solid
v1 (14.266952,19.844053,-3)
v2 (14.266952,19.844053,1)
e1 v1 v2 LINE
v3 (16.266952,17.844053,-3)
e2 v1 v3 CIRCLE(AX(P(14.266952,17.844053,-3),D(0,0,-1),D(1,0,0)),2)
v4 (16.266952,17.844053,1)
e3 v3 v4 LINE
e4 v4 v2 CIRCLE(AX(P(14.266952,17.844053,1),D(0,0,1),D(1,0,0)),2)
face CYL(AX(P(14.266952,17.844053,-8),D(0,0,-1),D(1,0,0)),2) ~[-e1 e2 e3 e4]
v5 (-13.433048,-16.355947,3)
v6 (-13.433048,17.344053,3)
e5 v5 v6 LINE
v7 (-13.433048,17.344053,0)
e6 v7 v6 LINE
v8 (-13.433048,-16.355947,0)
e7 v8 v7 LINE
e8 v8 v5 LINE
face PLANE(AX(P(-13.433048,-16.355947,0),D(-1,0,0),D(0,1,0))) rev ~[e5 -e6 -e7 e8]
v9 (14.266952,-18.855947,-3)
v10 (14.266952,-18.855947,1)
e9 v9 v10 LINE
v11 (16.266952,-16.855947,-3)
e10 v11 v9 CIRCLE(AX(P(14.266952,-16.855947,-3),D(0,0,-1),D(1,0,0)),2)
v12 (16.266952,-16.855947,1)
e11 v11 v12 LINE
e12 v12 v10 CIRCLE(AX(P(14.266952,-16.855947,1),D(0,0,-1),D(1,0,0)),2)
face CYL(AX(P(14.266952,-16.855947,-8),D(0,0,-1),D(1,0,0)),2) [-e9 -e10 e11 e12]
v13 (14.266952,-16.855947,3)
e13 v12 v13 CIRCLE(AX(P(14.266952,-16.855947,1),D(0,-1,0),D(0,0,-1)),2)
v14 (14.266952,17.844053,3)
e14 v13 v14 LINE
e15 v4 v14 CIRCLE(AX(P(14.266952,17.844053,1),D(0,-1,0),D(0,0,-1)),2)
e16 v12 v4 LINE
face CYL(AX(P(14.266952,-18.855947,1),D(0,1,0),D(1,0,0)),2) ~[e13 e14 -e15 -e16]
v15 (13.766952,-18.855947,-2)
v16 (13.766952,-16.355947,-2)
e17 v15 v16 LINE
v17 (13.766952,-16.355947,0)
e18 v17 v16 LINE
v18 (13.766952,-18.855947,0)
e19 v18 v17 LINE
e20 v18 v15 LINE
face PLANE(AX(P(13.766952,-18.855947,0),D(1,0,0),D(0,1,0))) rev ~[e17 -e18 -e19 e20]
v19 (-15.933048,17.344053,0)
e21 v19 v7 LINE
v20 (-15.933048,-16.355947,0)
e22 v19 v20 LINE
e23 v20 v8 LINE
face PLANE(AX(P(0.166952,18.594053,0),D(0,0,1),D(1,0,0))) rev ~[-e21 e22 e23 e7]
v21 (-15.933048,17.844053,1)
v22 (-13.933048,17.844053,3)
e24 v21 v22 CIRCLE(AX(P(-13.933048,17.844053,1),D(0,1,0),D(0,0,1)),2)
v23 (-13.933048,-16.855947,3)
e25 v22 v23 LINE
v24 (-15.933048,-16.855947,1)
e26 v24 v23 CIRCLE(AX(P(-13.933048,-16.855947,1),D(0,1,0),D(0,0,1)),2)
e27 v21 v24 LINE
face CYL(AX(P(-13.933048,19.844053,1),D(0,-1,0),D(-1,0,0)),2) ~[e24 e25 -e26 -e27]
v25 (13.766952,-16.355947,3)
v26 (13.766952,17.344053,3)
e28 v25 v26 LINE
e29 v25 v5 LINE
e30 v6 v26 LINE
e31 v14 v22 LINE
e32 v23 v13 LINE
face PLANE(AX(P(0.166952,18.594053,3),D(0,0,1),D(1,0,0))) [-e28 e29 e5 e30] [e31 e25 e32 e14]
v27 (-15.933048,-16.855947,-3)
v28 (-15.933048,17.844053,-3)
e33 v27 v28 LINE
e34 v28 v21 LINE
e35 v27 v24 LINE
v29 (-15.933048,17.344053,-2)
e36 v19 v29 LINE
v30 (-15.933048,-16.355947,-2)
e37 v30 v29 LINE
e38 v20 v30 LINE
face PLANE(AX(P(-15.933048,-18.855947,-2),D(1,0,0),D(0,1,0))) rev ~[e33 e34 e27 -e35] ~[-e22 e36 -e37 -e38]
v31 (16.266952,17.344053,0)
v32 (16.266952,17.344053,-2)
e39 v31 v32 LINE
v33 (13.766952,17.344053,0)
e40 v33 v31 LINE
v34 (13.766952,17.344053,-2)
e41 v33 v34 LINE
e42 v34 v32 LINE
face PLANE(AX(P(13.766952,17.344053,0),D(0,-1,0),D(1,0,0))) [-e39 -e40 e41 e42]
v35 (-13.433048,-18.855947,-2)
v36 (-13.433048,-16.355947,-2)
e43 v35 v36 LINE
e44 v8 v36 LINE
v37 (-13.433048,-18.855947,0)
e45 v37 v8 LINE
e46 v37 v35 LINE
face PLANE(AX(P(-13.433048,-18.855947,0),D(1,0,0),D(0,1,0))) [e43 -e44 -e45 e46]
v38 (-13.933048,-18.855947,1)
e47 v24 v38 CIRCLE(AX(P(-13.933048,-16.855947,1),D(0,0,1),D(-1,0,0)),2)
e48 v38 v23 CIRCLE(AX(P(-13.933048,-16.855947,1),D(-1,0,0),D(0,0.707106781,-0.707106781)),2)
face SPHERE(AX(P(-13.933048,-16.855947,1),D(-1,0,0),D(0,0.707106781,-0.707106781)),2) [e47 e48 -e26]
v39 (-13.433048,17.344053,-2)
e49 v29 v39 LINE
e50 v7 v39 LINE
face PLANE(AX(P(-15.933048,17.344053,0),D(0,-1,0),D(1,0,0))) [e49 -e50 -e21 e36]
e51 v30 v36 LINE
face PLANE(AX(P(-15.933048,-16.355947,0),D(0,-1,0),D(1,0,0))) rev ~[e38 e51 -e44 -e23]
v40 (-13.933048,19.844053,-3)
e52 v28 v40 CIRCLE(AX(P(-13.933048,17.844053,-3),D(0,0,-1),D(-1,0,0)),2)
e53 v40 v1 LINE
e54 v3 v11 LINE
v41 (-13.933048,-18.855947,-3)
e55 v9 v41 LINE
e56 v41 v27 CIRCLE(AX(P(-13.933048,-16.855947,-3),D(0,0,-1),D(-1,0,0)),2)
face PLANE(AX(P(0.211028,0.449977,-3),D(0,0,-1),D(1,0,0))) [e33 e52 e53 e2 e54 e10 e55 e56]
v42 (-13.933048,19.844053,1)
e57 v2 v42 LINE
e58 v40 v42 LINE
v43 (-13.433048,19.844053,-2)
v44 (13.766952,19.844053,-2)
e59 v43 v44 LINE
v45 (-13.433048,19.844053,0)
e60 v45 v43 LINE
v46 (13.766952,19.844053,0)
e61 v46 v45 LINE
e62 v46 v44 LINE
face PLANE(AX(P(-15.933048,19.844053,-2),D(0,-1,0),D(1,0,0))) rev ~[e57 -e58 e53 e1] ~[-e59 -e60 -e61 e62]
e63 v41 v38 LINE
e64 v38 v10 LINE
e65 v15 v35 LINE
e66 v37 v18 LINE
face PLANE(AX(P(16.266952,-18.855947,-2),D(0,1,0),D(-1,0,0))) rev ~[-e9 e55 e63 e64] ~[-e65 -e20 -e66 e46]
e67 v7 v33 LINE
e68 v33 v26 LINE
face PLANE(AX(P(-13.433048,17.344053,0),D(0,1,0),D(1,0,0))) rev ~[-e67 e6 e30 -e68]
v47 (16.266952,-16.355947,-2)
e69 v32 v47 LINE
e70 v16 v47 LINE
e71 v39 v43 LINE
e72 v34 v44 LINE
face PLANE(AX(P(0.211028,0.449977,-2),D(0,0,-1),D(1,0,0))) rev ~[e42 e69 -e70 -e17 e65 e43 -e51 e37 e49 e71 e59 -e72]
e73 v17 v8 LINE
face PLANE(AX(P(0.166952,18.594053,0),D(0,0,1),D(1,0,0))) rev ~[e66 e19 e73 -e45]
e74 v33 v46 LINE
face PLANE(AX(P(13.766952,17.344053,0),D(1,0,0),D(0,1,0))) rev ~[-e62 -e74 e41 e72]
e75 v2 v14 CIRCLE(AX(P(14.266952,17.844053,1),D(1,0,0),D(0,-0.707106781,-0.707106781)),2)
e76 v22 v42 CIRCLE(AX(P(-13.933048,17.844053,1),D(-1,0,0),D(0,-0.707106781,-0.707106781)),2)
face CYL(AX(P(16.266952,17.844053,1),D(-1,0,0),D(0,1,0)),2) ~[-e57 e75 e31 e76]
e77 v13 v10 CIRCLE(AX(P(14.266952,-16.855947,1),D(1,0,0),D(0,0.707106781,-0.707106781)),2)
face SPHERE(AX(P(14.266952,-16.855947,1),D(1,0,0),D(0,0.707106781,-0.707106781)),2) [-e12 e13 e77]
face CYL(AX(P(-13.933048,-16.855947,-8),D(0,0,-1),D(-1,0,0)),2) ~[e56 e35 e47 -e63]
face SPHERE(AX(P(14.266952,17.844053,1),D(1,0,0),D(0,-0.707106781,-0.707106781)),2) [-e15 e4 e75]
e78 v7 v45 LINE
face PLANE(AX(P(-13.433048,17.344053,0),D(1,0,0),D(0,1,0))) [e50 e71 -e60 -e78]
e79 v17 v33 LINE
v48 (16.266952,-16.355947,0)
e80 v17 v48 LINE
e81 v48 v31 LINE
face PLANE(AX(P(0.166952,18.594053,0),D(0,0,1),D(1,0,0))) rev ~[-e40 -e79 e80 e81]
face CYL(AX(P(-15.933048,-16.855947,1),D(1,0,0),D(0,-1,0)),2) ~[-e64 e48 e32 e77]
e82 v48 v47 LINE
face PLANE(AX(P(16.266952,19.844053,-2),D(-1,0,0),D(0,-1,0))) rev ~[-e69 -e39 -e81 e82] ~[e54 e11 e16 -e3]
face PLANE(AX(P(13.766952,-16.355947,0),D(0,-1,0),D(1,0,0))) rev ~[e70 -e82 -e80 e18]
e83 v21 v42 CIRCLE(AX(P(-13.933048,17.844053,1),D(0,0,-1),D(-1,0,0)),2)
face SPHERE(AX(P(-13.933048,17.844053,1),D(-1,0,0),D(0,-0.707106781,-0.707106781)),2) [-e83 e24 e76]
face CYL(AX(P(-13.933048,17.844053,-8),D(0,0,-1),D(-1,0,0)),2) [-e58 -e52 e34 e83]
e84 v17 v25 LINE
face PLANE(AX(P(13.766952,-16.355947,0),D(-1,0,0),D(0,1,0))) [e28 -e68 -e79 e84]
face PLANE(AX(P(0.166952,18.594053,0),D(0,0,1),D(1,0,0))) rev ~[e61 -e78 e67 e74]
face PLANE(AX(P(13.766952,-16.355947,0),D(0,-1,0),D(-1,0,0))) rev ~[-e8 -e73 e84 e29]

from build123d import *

# Parameters (mm, degrees)
F0_W         = 27.2
F0_H         = 2.5
F0_W_2       = 2.5
F0_H_2       = 33.7
F1_DEPTH     = 3
F2_R         = 2
F3_DEPTH     = 2
F4_W         = 2.5
F4_H         = 2.5
F5_DEPTH     = 1
F6_T1_DEPTH  = 9
F6_S5_W      = 2
F6_S5_H      = 2
F6_T6_DEPTH  = 2
F6_S11_W     = 2
F6_S11_H     = 2
F6_T12_DEPTH = 2
F6_S17_W     = 2
F6_S17_H     = 2
F6_T18_DEPTH = 2
F6_S23_W     = 2
F6_S23_H     = 2
F6_T24_DEPTH = 2


# Not quite as in the source:
# - a fillet or chamfer that OpenCascade refuses, or shapes differently, is made with other operations: its cross-section is extruded or revolved along the edge and cut away or added


with BuildPart() as f1:
    # F0 (on Top) → F1 (new body)
    with BuildSketch(Plane.XY):
        with Locations((0.1669520199, 18.5940534235)):
            Rectangle(F0_W, F0_H)
        with Locations((-14.6830479801, 0.4940534235)):
            Rectangle(F0_W_2, F0_H_2)
        with Locations((-14.6830479801, 18.5940534235)):
            Rectangle(F0_W_2, F0_H)
        with Locations((-14.6830479801, -17.6059465765)):
            Rectangle(F0_W_2, F0_H)
        with Locations((0.1669520199, -17.6059465765)):
            Rectangle(F0_W, F0_H)
        with Locations((15.0169520199, -17.6059465765)):
            Rectangle(F0_W_2, F0_H)
        with Locations((15.0169520199, 0.4940534235)):
            Rectangle(F0_W_2, F0_H_2)
        with Locations((15.0169520199, 18.5940534235)):
            Rectangle(F0_W_2, F0_H)
    extrude(amount=F1_DEPTH)

    # F2
    f2_edges = [f1.edges().sort_by_distance(p)[0] for p in [
        (16.266952, 0.494053, 3),
        (0.166952, 19.844053, 3),
        (-15.933048, 0.494053, 3),
        (0.166952, -18.855947, 3),
    ]]
    fillet(f2_edges, radius=F2_R)

    # F0 (on Top) → F3 (join)
    with BuildSketch(Plane.XY):
        with Locations((-14.6830479801, -17.6059465765)):
            Rectangle(F0_W_2, F0_H)
        with Locations((15.0169520199, -17.6059465765)):
            Rectangle(F0_W_2, F0_H)
        with Locations((15.0169520199, 18.5940534235)):
            Rectangle(F0_W_2, F0_H)
        with Locations((-14.6830479801, 18.5940534235)):
            Rectangle(F0_W_2, F0_H)
    extrude(amount=-F3_DEPTH)

    # F4 (on face) → F5 (join)
    with BuildSketch(Plane(origin=(0, 0, -2), x_dir=(1, 0, 0), z_dir=(0, 0, -1))):
        Polygon((-13.4330479801, -19.8440534235), (16.2669520199, -19.8440534235), (16.2669520199, 18.8559465765), (-15.9330479801, 18.8559465765), (-15.9330479801, -17.3440534235), (-13.4330479801, -17.3440534235), align=None)
        with Locations((-14.6830479801, -18.5940534235)):
            Rectangle(F4_W, F4_H)
    extrude(amount=F5_DEPTH)

    # F6: fillet of radius 2 on 4 edges, made by hand

    # F6_s2 → F6_t1 (cut)
    with BuildSketch(Plane.XY.offset(-8)):
        with BuildLine():
            ThreePointArc((16.2669520199, 17.8440534235), (15.6811655823, 19.2582669858), (14.2669520199, 19.8440534235))
            Line((14.2669520199, 19.8440534235), (16.2669520199, 19.8440534235))
            Line((16.2669520199, 19.8440534235), (16.2669520199, 17.8440534235))
        make_face()
        with BuildLine():
            ThreePointArc((16.2669520199, -16.8559465765), (15.6811655823, -18.2701601389), (14.2669520199, -18.8559465765))
            Line((14.2669520199, -18.8559465765), (16.2669520199, -18.8559465765))
            Line((16.2669520199, -18.8559465765), (16.2669520199, -16.8559465765))
        make_face()
        with BuildLine():
            ThreePointArc((-15.9330479801, -16.8559465765), (-15.3472615424, -18.2701601389), (-13.9330479801, -18.8559465765))
            Line((-13.9330479801, -18.8559465765), (-15.9330479801, -18.8559465765))
            Line((-15.9330479801, -18.8559465765), (-15.9330479801, -16.8559465765))
        make_face()
        with BuildLine():
            ThreePointArc((-15.9330479801, 17.8440534235), (-15.3472615424, 19.2582669858), (-13.9330479801, 19.8440534235))
            Line((-13.9330479801, 19.8440534235), (-15.9330479801, 19.8440534235))
            Line((-15.9330479801, 19.8440534235), (-15.9330479801, 17.8440534235))
        make_face()
    extrude(amount=F6_T1_DEPTH, mode=Mode.SUBTRACT)


with BuildPart() as f6_tool4:
    # F6_s5 → F6_t6 (new body)
    with BuildSketch(Plane.YZ.offset(-13.9330479801)):
        with Locations((18.8440534235, 2)):
            Rectangle(F6_S5_W, F6_S5_H)
    extrude(amount=-F6_T6_DEPTH)

    # F6_s7 → F6_t8 (revolve, cut)
    with BuildSketch(Plane(origin=(-13.9330479801, 17.8440534235, 1), x_dir=(0, -0.7071067812, -0.7071067812), z_dir=(0, 0.7071067812, -0.7071067812))):
        with BuildLine():
            ThreePointArc((0, -2), (2, 0), (0, 2))
            Line((0, 2), (0, -2))
        make_face()
    revolve(axis=Axis((-13.9330479801, 17.8440534235, 1), (-1, 0, 0)), mode=Mode.SUBTRACT)


with BuildPart() as f1_1:
    add(f1.part)

    # F6_t3: cut F6_tool4
    add(f6_tool4.part, mode=Mode.SUBTRACT)


with BuildPart() as f6_tool10:
    # F6_s11 → F6_t12 (new body)
    with BuildSketch(Plane.YZ.offset(-13.9330479801)):
        with Locations((-17.8559465765, 2)):
            Rectangle(F6_S11_W, F6_S11_H)
    extrude(amount=-F6_T12_DEPTH)

    # F6_s13 → F6_t14 (revolve, cut)
    with BuildSketch(Plane(origin=(-13.9330479801, -16.8559465765, 1), x_dir=(0, 0.7071067812, -0.7071067812), z_dir=(0, 0.7071067812, 0.7071067812))):
        with BuildLine():
            ThreePointArc((0, -2), (2, 0), (0, 2))
            Line((0, 2), (0, -2))
        make_face()
    revolve(axis=Axis((-13.9330479801, -16.8559465765, 1), (-1, 0, 0)), mode=Mode.SUBTRACT)


with BuildPart() as f1_2:
    add(f1_1.part)

    # F6_t9: cut F6_tool10
    add(f6_tool10.part, mode=Mode.SUBTRACT)


with BuildPart() as f6_tool16:
    # F6_s17 → F6_t18 (new body)
    with BuildSketch(Plane.YZ.offset(14.2669520199)):
        with Locations((-17.8559465765, 2)):
            Rectangle(F6_S17_W, F6_S17_H)
    extrude(amount=F6_T18_DEPTH)

    # F6_s19 → F6_t20 (revolve, cut)
    with BuildSketch(Plane(origin=(14.2669520199, -16.8559465765, 1), x_dir=(0, 0.7071067812, -0.7071067812), z_dir=(0, -0.7071067812, -0.7071067812))):
        with BuildLine():
            ThreePointArc((0, -2), (2, 0), (0, 2))
            Line((0, 2), (0, -2))
        make_face()
    revolve(axis=Axis((14.2669520199, -16.8559465765, 1), (1, 0, 0)), mode=Mode.SUBTRACT)


with BuildPart() as f1_3:
    add(f1_2.part)

    # F6_t15: cut F6_tool16
    add(f6_tool16.part, mode=Mode.SUBTRACT)


with BuildPart() as f6_tool22:
    # F6_s23 → F6_t24 (new body)
    with BuildSketch(Plane.YZ.offset(14.2669520199)):
        with Locations((18.8440534235, 2)):
            Rectangle(F6_S23_W, F6_S23_H)
    extrude(amount=F6_T24_DEPTH)

    # F6_s25 → F6_t26 (revolve, cut)
    with BuildSketch(Plane(origin=(14.2669520199, 17.8440534235, 1), x_dir=(0, -0.7071067812, -0.7071067812), z_dir=(0, -0.7071067812, 0.7071067812))):
        with BuildLine():
            ThreePointArc((0, -2), (2, 0), (0, 2))
            Line((0, 2), (0, -2))
        make_face()
    revolve(axis=Axis((14.2669520199, 17.8440534235, 1), (1, 0, 0)), mode=Mode.SUBTRACT)


with BuildPart() as f1_4:
    add(f1_3.part)

    # F6_t21: cut F6_tool22
    add(f6_tool22.part, mode=Mode.SUBTRACT)


solid = f1_4.part
